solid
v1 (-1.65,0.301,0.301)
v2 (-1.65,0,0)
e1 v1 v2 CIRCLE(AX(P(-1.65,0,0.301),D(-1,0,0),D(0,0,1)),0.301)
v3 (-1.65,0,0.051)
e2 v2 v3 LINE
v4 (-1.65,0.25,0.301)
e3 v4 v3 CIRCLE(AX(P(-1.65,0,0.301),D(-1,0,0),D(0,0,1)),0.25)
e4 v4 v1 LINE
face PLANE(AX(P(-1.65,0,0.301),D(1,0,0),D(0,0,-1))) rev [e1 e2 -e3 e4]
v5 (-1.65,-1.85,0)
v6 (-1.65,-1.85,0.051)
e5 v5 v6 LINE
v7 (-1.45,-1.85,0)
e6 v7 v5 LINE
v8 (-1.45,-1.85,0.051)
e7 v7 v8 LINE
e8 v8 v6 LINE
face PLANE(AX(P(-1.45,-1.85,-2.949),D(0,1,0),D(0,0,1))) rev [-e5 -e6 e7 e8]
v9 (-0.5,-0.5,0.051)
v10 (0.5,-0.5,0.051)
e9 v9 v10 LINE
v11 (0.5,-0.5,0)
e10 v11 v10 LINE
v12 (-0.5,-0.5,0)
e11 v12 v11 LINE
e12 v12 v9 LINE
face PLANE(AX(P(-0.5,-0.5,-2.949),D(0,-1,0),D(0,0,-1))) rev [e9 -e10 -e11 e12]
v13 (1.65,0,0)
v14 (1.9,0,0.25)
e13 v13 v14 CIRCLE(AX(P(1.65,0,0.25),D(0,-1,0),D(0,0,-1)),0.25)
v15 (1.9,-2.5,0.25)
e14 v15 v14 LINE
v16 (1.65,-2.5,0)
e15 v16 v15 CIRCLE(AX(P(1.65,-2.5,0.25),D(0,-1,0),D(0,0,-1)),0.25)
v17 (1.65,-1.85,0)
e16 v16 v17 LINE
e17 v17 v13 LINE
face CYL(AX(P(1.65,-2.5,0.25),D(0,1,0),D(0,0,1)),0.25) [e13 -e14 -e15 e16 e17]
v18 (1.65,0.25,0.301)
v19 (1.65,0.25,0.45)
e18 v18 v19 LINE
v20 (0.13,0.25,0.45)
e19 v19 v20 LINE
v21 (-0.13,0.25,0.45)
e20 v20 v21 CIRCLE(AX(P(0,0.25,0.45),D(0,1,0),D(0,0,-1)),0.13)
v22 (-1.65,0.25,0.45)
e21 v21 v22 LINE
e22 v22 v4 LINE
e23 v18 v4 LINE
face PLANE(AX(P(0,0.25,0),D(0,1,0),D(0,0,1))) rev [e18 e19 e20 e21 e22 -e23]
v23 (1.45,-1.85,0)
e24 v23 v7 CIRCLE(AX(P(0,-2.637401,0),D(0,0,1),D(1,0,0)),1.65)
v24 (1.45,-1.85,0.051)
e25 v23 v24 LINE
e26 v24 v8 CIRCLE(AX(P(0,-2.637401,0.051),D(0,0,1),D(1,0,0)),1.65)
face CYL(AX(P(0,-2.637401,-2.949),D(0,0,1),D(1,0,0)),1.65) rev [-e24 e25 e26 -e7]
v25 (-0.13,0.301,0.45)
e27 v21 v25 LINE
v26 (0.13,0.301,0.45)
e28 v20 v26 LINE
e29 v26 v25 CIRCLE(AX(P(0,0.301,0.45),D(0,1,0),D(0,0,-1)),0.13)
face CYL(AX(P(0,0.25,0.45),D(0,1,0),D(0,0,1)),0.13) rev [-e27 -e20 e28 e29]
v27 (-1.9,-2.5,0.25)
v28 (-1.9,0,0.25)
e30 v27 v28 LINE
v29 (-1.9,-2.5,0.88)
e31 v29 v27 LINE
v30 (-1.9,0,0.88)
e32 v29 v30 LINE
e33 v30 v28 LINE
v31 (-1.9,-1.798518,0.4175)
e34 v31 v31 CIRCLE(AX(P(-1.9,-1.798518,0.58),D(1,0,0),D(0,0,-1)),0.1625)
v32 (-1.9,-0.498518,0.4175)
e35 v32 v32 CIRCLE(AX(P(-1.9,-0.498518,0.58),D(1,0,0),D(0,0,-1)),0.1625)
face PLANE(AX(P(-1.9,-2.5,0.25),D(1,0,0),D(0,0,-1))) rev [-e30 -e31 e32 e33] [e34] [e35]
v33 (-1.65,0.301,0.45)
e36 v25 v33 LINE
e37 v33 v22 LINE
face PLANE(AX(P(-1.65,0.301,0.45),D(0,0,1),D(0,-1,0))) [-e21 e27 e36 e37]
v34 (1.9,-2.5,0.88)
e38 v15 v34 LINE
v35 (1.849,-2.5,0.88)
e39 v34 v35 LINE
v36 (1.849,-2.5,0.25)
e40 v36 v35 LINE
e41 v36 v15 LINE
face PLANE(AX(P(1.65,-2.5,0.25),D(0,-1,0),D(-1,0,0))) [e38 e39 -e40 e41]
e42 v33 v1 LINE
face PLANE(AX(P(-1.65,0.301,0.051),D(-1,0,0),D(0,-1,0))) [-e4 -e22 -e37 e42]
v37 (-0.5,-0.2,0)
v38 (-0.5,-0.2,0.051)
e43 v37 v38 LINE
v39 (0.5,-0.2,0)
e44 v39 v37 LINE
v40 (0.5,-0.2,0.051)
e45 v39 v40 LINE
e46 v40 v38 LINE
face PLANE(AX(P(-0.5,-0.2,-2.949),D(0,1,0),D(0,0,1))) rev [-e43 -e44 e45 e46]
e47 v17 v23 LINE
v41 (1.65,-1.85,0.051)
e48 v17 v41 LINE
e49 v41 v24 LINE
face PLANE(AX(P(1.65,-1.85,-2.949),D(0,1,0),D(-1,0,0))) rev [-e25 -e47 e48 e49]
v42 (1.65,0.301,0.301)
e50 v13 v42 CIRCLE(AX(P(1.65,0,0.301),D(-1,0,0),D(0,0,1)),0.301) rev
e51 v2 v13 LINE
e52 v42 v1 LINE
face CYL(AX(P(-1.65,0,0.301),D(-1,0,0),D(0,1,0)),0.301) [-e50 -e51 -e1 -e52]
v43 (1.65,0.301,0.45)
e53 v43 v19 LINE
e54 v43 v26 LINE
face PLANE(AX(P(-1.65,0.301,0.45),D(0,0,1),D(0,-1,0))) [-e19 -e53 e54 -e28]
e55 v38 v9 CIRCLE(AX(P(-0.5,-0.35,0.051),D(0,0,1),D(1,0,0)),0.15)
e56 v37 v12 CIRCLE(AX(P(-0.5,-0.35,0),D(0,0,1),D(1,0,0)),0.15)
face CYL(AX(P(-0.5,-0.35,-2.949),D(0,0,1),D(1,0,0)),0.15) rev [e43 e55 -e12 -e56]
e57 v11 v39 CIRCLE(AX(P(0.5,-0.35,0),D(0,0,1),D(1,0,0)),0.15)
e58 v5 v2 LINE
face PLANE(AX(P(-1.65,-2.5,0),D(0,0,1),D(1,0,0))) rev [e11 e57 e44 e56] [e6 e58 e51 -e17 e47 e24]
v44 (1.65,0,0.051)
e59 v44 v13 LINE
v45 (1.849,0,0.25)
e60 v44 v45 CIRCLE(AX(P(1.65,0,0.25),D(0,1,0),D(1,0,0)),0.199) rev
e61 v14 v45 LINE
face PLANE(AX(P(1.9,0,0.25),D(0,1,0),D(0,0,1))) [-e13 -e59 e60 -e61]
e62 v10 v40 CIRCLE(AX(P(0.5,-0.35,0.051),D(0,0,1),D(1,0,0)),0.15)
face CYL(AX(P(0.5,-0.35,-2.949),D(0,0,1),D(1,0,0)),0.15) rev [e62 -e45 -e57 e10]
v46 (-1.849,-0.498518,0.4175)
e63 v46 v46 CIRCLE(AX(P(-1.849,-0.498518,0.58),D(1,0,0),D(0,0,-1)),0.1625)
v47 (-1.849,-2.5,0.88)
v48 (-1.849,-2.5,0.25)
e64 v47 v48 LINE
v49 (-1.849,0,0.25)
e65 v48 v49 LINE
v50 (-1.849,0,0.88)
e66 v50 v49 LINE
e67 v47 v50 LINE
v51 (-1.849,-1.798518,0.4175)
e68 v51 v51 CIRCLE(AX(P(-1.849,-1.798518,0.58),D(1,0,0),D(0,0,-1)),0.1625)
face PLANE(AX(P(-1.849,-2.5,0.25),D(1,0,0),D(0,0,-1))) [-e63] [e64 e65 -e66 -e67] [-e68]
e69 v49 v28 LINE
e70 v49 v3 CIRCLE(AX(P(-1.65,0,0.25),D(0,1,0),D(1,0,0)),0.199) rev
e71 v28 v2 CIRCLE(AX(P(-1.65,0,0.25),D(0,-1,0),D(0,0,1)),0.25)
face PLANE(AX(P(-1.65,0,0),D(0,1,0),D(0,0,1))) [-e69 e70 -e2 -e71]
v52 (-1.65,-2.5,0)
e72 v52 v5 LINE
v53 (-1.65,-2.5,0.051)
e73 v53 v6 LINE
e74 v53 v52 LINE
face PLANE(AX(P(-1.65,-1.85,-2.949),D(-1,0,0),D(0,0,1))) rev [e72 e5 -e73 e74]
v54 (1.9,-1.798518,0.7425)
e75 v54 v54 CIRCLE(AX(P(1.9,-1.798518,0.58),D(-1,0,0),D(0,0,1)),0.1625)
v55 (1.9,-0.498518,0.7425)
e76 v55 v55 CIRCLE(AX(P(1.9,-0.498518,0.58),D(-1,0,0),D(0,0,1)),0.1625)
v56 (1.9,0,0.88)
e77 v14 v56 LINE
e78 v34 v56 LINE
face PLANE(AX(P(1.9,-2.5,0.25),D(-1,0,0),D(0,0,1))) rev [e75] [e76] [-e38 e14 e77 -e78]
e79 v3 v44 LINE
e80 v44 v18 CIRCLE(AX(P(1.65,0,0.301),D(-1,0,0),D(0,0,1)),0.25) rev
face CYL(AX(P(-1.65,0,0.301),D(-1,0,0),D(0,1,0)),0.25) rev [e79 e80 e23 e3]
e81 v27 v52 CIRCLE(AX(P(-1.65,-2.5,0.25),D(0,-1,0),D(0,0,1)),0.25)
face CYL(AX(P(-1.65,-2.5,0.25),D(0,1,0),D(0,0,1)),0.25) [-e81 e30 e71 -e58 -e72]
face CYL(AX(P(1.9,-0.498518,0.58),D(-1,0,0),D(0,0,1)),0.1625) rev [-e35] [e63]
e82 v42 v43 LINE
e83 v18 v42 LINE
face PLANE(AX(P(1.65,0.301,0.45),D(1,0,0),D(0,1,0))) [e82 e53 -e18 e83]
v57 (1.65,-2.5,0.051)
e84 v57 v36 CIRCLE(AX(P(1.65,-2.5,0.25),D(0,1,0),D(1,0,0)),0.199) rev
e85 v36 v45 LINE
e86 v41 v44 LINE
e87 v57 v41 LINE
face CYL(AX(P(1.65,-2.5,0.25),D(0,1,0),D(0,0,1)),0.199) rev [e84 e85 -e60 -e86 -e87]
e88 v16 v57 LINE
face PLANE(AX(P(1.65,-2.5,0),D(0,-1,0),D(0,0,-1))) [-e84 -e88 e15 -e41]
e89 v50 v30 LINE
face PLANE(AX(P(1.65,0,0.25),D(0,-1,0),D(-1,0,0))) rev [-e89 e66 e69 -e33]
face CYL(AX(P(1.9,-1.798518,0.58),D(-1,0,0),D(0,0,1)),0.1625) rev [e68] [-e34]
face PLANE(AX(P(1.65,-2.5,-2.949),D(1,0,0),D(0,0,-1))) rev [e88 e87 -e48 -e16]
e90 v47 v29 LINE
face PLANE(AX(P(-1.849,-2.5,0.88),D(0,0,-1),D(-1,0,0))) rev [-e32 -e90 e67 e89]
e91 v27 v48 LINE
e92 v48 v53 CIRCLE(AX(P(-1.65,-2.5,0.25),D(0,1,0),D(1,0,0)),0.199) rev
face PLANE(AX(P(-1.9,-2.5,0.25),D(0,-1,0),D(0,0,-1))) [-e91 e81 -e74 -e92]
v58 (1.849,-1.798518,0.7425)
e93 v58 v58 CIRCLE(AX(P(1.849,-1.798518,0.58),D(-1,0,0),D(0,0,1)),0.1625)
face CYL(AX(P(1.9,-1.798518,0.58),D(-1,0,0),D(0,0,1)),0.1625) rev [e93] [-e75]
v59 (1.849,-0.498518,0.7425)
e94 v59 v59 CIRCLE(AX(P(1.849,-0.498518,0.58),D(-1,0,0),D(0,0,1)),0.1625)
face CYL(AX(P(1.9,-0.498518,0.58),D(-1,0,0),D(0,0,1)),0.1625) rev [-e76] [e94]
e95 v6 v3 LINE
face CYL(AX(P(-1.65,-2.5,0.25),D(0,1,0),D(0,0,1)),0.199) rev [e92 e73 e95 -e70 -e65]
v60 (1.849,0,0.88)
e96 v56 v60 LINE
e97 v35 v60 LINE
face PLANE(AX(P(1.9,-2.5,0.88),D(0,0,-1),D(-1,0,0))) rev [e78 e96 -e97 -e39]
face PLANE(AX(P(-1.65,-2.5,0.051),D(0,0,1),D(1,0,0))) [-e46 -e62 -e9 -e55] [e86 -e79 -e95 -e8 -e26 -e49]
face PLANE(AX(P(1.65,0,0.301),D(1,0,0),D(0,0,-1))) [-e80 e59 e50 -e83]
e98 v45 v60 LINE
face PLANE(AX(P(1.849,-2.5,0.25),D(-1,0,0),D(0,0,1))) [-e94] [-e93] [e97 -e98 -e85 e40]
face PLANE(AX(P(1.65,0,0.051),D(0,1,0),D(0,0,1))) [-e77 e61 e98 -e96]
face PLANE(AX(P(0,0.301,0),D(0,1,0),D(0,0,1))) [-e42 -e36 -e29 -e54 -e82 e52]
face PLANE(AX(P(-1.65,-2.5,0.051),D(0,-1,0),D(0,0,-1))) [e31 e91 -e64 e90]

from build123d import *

# Parameters (mm, degrees)
BASE_FLANGE2_DEPTH      = 2.5
EDGE_FLANGE1_DEPTH      = 3.3
CUT_EXTRUDE4_DEPTH      = 3
CUT_EXTRUDE5_DEPTH      = 5.632968811
CUT_EXTRUDE5_DEPTH_BACK = 5.632968811
SKETCH14_R              = 0.1625
CUT_EXTRUDE8_DEPTH      = 0.051


# Sheet-metal steps are written as plain solids
with BuildPart() as part:
    # Sketch1 → Base-Flange2 (new body)
    with BuildSketch(Plane(origin=(0, 0, 0), x_dir=(1, 0, 0), z_dir=(0, 1, 0))):
        with BuildLine():
            Line((-1.9, -0.88), (-1.9, -0.25))
            ThreePointArc((-1.9, -0.25), (-1.826776695, -0.073223305), (-1.65, 0))
            Line((-1.65, 0), (1.65, 0))
            ThreePointArc((1.65, 0), (1.826776695, -0.073223305), (1.9, -0.25))
            Line((1.9, -0.25), (1.9, -0.88))
            Line((1.9, -0.88), (1.849, -0.88))
            Line((1.849, -0.88), (1.849, -0.25))
            ThreePointArc((1.849, -0.25), (1.790714249, -0.109285751), (1.65, -0.051))
            Line((1.65, -0.051), (-1.65, -0.051))
            ThreePointArc((-1.65, -0.051), (-1.790714249, -0.109285751), (-1.849, -0.25))
            Line((-1.849, -0.25), (-1.849, -0.88))
            Line((-1.849, -0.88), (-1.9, -0.88))
        make_face()
    extrude(amount=-BASE_FLANGE2_DEPTH)

    # Edge-Flange1 section (across the edge) → Edge-Flange1 (add)
    with BuildSketch(Plane(origin=(1.65, 0.25, 0.051), x_dir=(0, -1, 0), z_dir=(-1, 0, 0))):
        with BuildLine():
            Line((-0.051, 0.25), (-0.051, 0.399))
            Line((-0.051, 0.399), (0, 0.399))
            Line((0, 0.399), (0, 0.25))
            ThreePointArc((0, 0.25), (0.073223305, 0.073223305), (0.25, 0))
            Line((0.25, 0), (0.25, -0.051))
            ThreePointArc((0.25, -0.051), (0.037160859, 0.037160859), (-0.051, 0.25))
        make_face()
    extrude(amount=EDGE_FLANGE1_DEPTH)

    # Sketch13 → Cut-Extrude4 (cut)
    with BuildSketch(Plane.XY.offset(0.051)):
        with BuildLine():
            Line((-0.5, -0.2), (0.5, -0.2))
            ThreePointArc((0.5, -0.2), (0.65, -0.35), (0.5, -0.5))
            Line((0.5, -0.5), (-0.5, -0.5))
            ThreePointArc((-0.5, -0.5), (-0.65, -0.35), (-0.5, -0.2))
        make_face()
        with BuildLine():
            Line((1.65, -2.5), (1.65, -1.85))
            Line((1.65, -1.85), (1.45, -1.85))
            ThreePointArc((1.45, -1.85), (0, -0.987400787), (-1.45, -1.85))
            Line((-1.45, -1.85), (-1.65, -1.85))
            Line((-1.65, -1.85), (-1.65, -2.5))
            Line((-1.65, -2.5), (1.65, -2.5))
        make_face()
    extrude(amount=-CUT_EXTRUDE4_DEPTH, mode=Mode.SUBTRACT)

    # Sketch14 → Cut-Extrude5 (cut, two sides: drawn at the far end of the back side and taken through both)
    with BuildSketch(Plane.ZY.offset(1.9).offset(-CUT_EXTRUDE5_DEPTH_BACK)):
        with Locations((0.58, -0.498518338)):
            Circle(SKETCH14_R)
        with Locations((0.58, -1.798518338)):
            Circle(SKETCH14_R)
    extrude(amount=CUT_EXTRUDE5_DEPTH + CUT_EXTRUDE5_DEPTH_BACK, mode=Mode.SUBTRACT)

    # Sketch15 → Cut-Extrude8 (cut)
    with BuildSketch(Plane(origin=(0, 0.301, 0), x_dir=(1, 0, 0), z_dir=(0, 1, 0))):
        with BuildLine():
            Line((-0.13, -0.45), (0.13, -0.45))
            ThreePointArc((0.13, -0.45), (0, -0.32), (-0.13, -0.45))
        make_face()
    extrude(amount=-CUT_EXTRUDE8_DEPTH, mode=Mode.SUBTRACT)


solid = part.part
